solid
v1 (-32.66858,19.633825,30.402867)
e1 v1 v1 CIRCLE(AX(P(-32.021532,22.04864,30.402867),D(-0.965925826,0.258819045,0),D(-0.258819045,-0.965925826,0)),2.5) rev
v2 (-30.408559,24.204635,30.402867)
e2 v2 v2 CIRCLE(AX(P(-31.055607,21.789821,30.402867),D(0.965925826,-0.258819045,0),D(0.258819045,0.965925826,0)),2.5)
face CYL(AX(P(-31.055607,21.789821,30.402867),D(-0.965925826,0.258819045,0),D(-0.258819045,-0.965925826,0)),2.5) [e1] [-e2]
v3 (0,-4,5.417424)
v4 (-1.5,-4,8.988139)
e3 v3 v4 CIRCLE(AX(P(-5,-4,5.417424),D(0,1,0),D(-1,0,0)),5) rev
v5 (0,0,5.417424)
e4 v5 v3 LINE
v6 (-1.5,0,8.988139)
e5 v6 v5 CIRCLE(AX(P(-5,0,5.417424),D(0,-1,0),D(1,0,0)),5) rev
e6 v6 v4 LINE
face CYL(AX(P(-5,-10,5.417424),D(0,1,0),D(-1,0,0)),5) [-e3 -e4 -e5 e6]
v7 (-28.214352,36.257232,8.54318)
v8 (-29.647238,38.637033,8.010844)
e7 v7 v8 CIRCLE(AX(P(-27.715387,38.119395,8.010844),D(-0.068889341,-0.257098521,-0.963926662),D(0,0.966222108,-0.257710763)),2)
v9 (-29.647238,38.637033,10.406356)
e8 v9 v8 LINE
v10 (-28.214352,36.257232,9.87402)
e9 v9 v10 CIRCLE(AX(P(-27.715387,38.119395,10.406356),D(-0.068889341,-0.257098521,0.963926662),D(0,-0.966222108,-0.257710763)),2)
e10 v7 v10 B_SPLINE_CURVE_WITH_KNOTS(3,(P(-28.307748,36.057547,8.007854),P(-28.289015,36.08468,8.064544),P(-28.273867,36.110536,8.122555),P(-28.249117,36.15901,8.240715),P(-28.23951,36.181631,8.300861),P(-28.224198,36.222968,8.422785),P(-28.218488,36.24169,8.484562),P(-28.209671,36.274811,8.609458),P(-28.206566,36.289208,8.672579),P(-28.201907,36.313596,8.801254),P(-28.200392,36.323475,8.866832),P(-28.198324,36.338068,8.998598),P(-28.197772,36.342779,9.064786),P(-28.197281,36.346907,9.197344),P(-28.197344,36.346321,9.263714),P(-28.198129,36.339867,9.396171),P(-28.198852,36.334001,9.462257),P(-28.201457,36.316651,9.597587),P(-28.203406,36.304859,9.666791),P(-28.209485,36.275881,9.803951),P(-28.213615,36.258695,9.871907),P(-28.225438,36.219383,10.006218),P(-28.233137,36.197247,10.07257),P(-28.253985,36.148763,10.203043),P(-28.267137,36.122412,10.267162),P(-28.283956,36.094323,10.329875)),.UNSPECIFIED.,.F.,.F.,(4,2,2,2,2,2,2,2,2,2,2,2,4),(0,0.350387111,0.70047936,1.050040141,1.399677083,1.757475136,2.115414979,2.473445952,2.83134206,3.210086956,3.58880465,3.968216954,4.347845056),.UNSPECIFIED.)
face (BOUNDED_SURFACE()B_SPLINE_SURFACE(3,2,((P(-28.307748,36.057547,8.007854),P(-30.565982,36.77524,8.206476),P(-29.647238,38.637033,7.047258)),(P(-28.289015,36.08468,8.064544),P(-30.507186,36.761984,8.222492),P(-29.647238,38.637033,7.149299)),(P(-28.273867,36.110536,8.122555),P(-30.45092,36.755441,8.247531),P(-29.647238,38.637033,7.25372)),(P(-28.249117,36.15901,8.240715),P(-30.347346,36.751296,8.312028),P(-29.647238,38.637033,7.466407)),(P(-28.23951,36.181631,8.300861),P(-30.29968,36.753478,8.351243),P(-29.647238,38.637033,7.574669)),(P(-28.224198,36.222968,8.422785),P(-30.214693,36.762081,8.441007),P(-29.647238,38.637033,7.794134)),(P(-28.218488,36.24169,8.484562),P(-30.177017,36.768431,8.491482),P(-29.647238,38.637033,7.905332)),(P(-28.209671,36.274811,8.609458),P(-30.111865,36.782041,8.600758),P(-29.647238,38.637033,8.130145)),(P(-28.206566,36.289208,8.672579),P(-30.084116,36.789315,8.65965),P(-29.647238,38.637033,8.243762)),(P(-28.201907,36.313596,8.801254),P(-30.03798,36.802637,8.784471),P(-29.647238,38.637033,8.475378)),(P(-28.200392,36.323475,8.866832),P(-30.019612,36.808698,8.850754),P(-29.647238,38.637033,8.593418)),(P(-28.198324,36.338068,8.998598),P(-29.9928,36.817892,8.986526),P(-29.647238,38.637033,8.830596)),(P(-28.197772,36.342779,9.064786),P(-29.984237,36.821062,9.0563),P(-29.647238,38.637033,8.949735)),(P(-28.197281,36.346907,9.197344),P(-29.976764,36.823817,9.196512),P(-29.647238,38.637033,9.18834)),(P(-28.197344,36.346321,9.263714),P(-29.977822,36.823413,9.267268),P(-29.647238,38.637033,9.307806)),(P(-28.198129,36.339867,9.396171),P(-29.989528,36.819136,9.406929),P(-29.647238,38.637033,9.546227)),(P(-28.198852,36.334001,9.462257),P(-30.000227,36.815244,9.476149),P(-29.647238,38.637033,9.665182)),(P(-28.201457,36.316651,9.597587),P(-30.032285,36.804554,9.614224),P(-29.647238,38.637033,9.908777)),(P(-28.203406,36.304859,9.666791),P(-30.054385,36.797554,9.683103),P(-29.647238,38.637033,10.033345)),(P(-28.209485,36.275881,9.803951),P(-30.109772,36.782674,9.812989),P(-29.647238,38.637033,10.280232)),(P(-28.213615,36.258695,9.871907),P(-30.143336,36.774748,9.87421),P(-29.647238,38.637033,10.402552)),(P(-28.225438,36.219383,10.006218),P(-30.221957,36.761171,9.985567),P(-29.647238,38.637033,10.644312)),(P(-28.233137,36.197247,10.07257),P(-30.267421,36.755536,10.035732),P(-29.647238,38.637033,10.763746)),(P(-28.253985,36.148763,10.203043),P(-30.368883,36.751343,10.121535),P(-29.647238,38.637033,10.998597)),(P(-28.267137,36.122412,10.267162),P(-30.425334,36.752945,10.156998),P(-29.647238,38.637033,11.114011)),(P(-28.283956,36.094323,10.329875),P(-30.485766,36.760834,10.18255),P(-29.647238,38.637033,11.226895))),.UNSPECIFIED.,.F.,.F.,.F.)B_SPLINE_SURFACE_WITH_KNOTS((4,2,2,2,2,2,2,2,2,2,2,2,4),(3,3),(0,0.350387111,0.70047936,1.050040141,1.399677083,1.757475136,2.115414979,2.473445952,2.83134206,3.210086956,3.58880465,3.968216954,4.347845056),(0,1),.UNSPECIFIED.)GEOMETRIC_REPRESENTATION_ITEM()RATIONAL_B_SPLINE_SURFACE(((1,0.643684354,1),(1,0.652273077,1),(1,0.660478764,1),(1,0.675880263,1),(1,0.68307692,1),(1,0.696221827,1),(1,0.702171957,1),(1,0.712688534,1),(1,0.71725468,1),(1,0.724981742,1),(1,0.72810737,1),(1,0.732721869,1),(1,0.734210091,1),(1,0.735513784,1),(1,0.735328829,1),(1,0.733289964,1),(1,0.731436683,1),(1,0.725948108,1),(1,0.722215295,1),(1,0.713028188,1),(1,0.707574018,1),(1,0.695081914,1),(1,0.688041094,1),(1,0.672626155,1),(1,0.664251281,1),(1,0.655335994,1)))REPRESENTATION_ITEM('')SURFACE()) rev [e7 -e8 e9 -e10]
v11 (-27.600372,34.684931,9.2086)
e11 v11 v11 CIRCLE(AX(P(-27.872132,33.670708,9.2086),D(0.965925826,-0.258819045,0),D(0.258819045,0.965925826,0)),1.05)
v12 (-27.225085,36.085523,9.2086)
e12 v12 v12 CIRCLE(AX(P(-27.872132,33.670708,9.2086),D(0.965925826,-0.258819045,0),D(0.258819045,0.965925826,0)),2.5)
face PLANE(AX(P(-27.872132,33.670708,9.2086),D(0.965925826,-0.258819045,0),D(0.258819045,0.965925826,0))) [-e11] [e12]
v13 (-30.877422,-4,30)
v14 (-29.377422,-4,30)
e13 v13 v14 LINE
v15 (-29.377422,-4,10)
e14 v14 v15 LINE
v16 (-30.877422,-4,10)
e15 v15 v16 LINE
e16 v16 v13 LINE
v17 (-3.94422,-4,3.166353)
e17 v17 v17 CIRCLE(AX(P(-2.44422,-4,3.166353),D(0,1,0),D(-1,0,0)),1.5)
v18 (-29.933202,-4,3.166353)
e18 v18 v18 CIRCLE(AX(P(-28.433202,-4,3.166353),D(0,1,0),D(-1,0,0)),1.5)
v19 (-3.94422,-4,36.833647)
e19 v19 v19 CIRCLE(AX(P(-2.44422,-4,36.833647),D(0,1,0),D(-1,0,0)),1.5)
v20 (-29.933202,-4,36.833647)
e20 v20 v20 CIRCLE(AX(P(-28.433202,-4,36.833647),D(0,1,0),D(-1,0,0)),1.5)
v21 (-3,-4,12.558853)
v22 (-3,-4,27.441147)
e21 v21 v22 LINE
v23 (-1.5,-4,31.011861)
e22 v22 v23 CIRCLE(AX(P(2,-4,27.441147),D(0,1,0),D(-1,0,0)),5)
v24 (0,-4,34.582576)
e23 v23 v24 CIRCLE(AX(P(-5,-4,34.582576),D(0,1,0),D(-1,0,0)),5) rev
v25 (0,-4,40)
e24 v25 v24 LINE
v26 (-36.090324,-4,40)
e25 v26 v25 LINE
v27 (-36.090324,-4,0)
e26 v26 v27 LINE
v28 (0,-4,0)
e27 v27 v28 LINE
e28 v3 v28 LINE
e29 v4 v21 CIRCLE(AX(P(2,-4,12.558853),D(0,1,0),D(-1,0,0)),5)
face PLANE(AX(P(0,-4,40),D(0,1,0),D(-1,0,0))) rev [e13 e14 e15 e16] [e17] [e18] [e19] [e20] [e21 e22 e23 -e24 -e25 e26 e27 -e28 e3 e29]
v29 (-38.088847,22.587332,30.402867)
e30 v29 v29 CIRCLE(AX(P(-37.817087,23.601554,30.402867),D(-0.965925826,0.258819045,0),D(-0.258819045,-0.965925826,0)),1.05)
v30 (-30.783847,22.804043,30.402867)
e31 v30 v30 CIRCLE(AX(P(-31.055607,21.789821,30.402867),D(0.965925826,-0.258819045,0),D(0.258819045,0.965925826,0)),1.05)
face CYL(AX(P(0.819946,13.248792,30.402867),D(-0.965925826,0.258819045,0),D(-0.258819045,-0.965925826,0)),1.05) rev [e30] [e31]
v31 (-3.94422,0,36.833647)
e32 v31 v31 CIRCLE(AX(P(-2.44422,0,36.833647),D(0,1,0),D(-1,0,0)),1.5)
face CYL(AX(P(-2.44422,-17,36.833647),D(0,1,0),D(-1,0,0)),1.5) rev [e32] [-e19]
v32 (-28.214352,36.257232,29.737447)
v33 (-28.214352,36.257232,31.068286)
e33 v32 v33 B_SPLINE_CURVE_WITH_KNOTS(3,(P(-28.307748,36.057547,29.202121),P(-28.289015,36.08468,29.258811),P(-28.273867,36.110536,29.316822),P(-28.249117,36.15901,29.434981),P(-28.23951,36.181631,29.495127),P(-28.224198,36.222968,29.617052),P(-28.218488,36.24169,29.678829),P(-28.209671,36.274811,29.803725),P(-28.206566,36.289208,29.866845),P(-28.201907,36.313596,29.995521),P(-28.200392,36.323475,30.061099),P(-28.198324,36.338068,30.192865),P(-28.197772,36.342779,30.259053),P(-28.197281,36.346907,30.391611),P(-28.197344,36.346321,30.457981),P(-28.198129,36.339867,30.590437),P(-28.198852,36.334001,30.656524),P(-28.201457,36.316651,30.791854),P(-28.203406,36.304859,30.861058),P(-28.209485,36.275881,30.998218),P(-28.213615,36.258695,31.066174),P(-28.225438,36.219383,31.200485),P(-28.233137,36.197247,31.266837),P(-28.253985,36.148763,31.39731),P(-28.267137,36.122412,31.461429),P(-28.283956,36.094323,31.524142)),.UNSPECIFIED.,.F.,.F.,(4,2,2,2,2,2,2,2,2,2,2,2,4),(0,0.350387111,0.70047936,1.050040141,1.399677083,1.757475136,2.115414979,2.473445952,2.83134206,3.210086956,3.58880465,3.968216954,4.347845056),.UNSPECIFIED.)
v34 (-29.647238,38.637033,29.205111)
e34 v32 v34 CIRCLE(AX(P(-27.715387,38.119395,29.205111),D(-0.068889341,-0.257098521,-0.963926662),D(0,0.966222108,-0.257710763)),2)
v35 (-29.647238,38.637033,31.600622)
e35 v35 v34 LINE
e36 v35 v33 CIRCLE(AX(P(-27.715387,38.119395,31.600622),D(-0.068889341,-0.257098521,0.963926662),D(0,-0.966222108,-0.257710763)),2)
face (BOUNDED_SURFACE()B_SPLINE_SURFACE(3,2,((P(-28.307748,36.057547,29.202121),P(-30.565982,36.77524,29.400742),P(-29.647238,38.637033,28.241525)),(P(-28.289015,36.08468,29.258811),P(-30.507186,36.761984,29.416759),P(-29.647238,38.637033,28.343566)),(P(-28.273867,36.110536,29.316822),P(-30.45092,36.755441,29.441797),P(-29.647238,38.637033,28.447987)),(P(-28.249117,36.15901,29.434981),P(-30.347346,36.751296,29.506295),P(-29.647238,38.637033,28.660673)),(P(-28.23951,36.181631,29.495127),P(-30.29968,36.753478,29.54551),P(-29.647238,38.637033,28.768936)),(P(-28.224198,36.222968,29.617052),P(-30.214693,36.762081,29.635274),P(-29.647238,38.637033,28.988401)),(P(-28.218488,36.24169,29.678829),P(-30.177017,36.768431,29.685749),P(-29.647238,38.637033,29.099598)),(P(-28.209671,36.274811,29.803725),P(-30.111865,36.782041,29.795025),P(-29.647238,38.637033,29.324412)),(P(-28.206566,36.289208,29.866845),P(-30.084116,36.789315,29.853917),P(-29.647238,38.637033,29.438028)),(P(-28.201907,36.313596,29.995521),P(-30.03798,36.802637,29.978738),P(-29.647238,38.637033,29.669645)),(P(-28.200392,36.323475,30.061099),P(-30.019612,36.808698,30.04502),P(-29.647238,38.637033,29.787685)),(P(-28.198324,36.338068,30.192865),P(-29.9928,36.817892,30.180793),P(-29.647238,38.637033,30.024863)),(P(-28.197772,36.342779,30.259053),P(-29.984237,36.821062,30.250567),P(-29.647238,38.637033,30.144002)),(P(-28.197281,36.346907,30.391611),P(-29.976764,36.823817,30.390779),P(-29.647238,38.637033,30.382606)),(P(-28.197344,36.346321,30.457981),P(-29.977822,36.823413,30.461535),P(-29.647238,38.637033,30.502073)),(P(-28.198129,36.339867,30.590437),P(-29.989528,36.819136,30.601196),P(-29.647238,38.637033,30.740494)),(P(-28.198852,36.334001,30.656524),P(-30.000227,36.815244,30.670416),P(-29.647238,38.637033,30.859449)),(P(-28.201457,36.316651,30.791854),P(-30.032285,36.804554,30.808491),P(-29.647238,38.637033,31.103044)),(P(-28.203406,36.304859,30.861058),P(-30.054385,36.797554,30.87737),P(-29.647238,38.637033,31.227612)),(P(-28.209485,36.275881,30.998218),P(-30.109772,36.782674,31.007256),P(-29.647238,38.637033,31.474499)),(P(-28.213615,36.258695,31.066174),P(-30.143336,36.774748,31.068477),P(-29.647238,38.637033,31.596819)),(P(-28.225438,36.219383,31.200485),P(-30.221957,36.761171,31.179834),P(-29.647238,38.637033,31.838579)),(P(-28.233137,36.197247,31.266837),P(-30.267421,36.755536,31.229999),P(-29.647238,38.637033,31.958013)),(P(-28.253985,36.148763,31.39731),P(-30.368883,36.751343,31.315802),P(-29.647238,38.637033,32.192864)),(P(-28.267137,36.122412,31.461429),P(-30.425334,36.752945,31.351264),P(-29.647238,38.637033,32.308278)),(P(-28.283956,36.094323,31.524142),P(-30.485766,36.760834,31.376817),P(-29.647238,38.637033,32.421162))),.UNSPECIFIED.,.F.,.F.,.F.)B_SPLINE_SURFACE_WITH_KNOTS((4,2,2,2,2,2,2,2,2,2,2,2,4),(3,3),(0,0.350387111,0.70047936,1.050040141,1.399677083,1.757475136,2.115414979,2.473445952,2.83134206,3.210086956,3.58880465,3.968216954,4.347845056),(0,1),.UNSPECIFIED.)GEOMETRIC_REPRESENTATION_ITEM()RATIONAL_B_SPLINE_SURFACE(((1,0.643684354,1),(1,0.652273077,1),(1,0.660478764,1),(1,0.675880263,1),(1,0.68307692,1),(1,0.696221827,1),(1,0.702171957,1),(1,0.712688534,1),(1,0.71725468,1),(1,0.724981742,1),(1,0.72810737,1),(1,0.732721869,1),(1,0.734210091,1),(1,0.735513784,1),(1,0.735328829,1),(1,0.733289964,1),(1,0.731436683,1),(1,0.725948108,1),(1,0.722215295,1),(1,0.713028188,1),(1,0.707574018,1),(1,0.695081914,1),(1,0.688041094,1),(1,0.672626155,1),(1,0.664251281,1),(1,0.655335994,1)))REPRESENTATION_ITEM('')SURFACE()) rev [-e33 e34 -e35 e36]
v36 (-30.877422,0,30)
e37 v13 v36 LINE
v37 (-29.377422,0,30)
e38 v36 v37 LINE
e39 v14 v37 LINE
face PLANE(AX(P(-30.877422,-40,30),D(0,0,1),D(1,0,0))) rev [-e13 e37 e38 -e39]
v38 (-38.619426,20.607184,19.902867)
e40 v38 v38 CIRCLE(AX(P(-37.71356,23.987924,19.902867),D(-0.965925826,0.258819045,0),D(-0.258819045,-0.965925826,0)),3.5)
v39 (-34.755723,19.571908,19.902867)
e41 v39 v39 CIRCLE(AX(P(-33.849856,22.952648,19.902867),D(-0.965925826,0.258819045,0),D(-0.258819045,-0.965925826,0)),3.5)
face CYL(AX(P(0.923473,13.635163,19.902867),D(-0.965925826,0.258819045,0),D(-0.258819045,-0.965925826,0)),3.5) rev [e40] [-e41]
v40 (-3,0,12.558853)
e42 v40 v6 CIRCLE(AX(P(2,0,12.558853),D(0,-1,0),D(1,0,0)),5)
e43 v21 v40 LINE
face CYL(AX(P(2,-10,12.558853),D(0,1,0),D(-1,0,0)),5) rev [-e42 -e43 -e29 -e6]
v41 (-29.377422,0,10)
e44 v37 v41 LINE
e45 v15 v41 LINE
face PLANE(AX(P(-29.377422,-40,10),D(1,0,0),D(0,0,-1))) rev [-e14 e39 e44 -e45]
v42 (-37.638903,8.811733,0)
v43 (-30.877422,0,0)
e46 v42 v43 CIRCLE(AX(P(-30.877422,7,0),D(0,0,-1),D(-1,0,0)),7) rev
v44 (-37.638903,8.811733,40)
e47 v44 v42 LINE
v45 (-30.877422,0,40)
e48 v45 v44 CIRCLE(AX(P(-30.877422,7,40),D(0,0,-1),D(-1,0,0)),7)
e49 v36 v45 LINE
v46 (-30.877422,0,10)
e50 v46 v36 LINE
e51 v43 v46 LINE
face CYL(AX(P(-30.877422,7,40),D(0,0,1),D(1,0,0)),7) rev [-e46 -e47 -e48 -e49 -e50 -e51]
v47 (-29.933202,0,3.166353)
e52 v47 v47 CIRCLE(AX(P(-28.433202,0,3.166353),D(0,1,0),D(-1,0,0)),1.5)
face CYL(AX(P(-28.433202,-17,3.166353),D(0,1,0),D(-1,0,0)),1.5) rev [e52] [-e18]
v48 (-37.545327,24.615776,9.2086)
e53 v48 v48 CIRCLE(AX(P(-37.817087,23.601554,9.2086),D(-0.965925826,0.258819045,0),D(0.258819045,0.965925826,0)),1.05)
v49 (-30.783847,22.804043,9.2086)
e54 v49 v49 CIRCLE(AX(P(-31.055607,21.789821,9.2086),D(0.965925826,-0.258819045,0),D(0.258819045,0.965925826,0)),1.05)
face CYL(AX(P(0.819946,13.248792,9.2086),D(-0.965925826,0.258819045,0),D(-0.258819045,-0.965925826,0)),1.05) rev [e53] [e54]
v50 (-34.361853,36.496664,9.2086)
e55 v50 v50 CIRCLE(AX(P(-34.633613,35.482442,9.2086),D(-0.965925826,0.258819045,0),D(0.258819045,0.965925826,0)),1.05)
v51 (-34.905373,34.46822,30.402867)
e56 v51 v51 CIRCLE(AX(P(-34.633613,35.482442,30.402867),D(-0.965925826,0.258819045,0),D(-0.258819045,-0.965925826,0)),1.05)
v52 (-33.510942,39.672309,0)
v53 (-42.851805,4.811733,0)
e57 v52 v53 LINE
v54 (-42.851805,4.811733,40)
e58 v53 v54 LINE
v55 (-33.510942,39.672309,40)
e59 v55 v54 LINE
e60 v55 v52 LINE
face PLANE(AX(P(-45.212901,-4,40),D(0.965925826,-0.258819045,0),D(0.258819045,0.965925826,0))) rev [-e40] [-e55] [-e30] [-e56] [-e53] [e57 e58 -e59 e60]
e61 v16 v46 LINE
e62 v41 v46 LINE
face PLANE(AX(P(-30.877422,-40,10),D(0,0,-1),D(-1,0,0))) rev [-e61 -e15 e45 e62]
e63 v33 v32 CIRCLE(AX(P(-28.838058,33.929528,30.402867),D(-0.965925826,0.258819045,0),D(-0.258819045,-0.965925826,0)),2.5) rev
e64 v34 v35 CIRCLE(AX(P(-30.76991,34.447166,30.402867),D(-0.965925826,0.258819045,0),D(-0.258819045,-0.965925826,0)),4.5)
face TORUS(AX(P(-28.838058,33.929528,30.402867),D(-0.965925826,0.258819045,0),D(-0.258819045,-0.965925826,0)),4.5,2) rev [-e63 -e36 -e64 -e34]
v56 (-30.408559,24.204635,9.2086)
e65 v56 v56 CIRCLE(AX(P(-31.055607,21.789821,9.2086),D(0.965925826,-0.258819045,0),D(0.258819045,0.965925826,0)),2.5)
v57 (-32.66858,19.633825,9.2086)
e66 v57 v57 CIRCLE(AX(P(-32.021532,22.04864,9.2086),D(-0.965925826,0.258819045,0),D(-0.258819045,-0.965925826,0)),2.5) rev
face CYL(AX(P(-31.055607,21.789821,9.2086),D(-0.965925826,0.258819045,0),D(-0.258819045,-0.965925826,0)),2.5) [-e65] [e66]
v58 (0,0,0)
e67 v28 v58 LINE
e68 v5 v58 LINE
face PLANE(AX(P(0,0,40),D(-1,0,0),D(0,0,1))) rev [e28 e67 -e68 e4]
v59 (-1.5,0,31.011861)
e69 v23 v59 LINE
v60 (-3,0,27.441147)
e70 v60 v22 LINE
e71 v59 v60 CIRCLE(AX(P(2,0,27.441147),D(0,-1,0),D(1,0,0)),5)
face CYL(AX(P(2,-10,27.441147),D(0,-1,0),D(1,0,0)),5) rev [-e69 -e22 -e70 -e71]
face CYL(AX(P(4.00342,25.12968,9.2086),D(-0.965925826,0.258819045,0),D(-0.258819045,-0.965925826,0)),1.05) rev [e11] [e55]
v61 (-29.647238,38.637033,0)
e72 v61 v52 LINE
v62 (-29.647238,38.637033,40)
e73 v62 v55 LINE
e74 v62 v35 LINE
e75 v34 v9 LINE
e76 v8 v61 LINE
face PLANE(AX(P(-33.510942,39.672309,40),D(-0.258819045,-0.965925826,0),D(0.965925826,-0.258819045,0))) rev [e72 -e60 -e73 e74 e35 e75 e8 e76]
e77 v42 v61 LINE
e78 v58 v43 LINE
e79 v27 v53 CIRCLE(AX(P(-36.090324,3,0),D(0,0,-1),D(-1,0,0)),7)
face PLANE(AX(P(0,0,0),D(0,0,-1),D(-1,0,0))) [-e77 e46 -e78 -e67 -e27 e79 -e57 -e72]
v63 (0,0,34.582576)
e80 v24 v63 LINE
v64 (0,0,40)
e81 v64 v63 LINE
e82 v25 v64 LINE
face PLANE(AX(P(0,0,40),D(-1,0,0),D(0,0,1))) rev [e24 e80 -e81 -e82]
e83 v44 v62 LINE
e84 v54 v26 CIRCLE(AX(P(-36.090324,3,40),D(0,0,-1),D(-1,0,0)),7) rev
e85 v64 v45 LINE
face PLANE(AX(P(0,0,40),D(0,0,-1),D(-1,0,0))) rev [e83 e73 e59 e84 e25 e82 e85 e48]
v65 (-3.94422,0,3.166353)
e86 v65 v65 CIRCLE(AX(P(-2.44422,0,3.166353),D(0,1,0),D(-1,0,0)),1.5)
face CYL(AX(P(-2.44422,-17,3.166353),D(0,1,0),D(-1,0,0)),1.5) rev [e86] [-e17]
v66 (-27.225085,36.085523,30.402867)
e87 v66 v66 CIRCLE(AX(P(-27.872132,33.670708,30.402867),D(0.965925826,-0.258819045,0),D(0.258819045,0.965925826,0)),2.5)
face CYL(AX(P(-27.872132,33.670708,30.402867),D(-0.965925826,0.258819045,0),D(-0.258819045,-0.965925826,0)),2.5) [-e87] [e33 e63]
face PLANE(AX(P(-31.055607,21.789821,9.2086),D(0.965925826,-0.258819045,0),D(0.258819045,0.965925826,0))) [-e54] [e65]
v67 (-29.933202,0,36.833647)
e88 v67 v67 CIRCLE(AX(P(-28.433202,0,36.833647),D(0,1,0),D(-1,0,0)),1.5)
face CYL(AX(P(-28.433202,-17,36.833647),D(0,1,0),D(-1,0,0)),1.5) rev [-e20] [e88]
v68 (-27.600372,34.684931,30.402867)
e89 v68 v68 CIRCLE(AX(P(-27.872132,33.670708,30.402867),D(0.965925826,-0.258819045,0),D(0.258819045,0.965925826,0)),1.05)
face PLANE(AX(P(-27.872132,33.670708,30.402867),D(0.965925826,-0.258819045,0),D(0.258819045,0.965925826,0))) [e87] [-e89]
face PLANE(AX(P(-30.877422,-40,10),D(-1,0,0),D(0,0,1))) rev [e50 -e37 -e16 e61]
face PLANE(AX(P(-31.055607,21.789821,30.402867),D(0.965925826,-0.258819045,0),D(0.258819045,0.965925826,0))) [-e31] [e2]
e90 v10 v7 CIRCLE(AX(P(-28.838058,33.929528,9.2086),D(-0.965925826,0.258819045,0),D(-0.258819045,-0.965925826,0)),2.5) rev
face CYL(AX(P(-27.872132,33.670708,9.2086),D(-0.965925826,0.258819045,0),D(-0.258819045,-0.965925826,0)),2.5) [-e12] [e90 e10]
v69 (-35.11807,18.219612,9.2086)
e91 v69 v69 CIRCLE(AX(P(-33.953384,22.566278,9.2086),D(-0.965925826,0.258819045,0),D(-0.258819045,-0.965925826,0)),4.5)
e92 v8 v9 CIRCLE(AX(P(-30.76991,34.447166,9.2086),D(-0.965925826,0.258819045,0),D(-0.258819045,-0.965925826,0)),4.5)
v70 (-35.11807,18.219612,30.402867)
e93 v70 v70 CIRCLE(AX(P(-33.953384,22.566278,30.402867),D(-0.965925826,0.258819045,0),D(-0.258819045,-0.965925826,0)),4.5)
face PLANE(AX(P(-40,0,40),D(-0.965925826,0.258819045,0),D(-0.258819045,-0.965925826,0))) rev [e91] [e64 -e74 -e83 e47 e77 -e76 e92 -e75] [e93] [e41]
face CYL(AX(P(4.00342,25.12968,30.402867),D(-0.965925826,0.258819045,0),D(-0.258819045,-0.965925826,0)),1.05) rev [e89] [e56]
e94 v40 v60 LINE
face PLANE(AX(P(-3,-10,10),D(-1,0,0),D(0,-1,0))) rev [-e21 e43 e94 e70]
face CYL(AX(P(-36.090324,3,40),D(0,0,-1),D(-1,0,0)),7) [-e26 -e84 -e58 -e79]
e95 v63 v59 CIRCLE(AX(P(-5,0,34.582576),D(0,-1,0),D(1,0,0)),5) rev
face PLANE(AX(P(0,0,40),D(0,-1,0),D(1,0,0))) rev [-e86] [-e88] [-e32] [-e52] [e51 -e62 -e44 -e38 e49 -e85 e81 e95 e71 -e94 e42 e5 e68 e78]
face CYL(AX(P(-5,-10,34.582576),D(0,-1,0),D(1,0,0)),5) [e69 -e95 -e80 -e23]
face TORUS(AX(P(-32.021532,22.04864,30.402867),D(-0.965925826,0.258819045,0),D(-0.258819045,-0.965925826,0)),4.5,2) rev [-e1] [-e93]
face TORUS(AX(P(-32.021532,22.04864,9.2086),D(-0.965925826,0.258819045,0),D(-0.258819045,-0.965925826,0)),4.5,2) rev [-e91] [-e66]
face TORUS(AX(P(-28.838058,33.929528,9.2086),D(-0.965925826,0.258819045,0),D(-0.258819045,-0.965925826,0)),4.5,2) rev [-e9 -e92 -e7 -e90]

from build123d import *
from build123d.topology import SkipClean

# Parameters (mm, degrees)
ESTRUSIONE_ESTRUSIONE1_DEPTH = 40
RACCORDO1_R                  = 7
SCHIZZO2_W                   = 1.5
SCHIZZO2_H                   = 20
TAGLIO_ESTRUSIONE1_DEPTH     = 40
SCHIZZO3_R                   = 1.05
SCHIZZO3_R_2                 = 3.5
TAGLIO_ESTRUSIONE2_DEPTH     = 40
SCHIZZO4_R                   = 2.5
SCHIZZO4_R_2                 = 1.05
ESTRUSIONE_ESTRUSIONE2_DEPTH = 3
RACCORDO2_R                  = 2
SCHIZZO5_R                   = 1.5
TAGLIO_ESTRUSIONE3_DEPTH     = 17
TAGLIO_ESTRUSIONE4_DEPTH     = 10
RACCORDO3_R                  = 5
RACCORDO4_R                  = 5


with BuildPart() as part:
    # Schizzo1 → Estrusione-Estrusione1 (new body)
    with BuildSketch(Plane.XY):
        Polygon((0, 0), (-40, 0), (-29.647238196, 38.637033052), (-33.510941501, 39.672309232), (-45.212901491, -4), (0, -4), align=None)
    extrude(amount=ESTRUSIONE_ESTRUSIONE1_DEPTH)

    # Raccordo1
    raccordo1_edges = [part.edges().sort_by_distance(p)[0] for p in [
        (-45.212901491, -4, 20),
        (-40, 0, 20),
    ]]
    fillet(raccordo1_edges, radius=RACCORDO1_R)

    # Schizzo2 → Taglio-Estrusione1 (cut)
    with BuildSketch(Plane(origin=(0, 0, 0), x_dir=(1, 0, 0), z_dir=(0, 1, 0))):
        with Locations((-30.12742239, -20)):
            Rectangle(SCHIZZO2_W, SCHIZZO2_H)
    extrude(amount=-TAGLIO_ESTRUSIONE1_DEPTH, mode=Mode.SUBTRACT)

    # Schizzo3 → Taglio-Estrusione2 (cut)
    with BuildSketch(Plane(origin=(-41.184211381, 11.03527618, 0), x_dir=(0, 0, 1), z_dir=(-0.9659258262890673, 0.2588190451025247, 0))):
        with Locations(Location((30.402866557, 25.309568218, 0), (0, 0, 270))):
            Circle(SCHIZZO3_R)
        with Locations(Location((9.20859967, 25.309568218, 0), (0, 0, 270))):
            Circle(SCHIZZO3_R)
        with Locations(Location((30.402866557, 13.009568218, 0), (0, 0, 270))):
            Circle(SCHIZZO3_R)
        with Locations(Location((9.20859967, 13.009568218, 0), (0, 0, 270))):
            Circle(SCHIZZO3_R)
        with Locations(Location((19.902866557, 13.409568216, 0), (0, 0, 270))):
            Circle(SCHIZZO3_R_2)
    extrude(amount=-TAGLIO_ESTRUSIONE2_DEPTH, mode=Mode.SUBTRACT)

    # Schizzo4 → Estrusione-Estrusione2 (add)
    # profile 1 of 4: a face of its own
    with SkipClean():  # the faces are left unmerged after this step: merging them gives an invalid solid
        with BuildSketch(Plane(origin=(-37.320508076, 10, 0), x_dir=(0, 0, -1), z_dir=(0.9659258262890674, -0.2588190451025245, 0))):
            with Locations(Location((-9.20859967, 13.009568218, 0), (0, 0, 270))):
                Circle(SCHIZZO4_R)
            with Locations(Location((-9.20859967, 13.009568218, 0), (0, 0, 90))):
                Circle(SCHIZZO4_R_2, mode=Mode.SUBTRACT)
        # profile 2 of 4: a face of its own
        with BuildSketch(Plane(origin=(-37.320508076, 10, 0), x_dir=(0, 0, -1), z_dir=(0.9659258262890674, -0.2588190451025245, 0))):
            with Locations(Location((-30.402866557, 13.009568218, 0), (0, 0, 270))):
                Circle(SCHIZZO4_R)
            with Locations(Location((-30.402866557, 13.009568218, 0), (0, 0, 270))):
                Circle(SCHIZZO4_R_2, mode=Mode.SUBTRACT)
        # profile 3 of 4: a face of its own
        with BuildSketch(Plane(origin=(-37.320508076, 10, 0), x_dir=(0, 0, -1), z_dir=(0.9659258262890674, -0.2588190451025245, 0))):
            with Locations(Location((-30.402866557, 25.309568218, 0), (0, 0, 270))):
                Circle(SCHIZZO4_R)
            with Locations(Location((-30.402866557, 25.309568218, 0), (0, 0, 270))):
                Circle(SCHIZZO4_R_2, mode=Mode.SUBTRACT)
        # profile 4 of 4: a face of its own
        with BuildSketch(Plane(origin=(-37.320508076, 10, 0), x_dir=(0, 0, -1), z_dir=(0.9659258262890674, -0.2588190451025245, 0))):
            with Locations(Location((-9.20859967, 25.309568218, 0), (0, 0, 270))):
                Circle(SCHIZZO4_R)
            with Locations(Location((-9.20859967, 25.309568218, 0), (0, 0, 90))):
                Circle(SCHIZZO4_R_2, mode=Mode.SUBTRACT)
        extrude(amount=ESTRUSIONE_ESTRUSIONE2_DEPTH)
    add(part.part.scale(1), mode=Mode.REPLACE)  # the faces are merged on a copy

    # Raccordo2
    raccordo2_edges = [part.edges().sort_by_distance(p)[0] for p in [
        (-30.122862185, 36.86198016, 9.20859967),
        (-33.306336439, 24.981092497, 9.20859967),
        (-33.306336439, 24.981092497, 30.402866557),
        (-30.122862185, 36.86198016, 30.402866557),
    ]]
    fillet(raccordo2_edges, radius=RACCORDO2_R)

    # Schizzo5 → Taglio-Estrusione3 (cut)
    with BuildSketch(Plane(origin=(0, 0, 0), x_dir=(1, 0, 0), z_dir=(0, 1, 0))):
        with Locations(Location((-2.444220089, -36.8336475, 0), (0, 0, 180))):
            Circle(SCHIZZO5_R)
        with Locations(Location((-2.444220089, -3.1663525, 0), (0, 0, 180))):
            Circle(SCHIZZO5_R)
        with Locations(Location((-28.433202301, -3.1663525, 0), (0, 0, 180))):
            Circle(SCHIZZO5_R)
        with Locations(Location((-28.433202301, -36.8336475, 0), (0, 0, 180))):
            Circle(SCHIZZO5_R)
    extrude(amount=-TAGLIO_ESTRUSIONE3_DEPTH, mode=Mode.SUBTRACT)

    # Schizzo6 → Taglio-Estrusione4 (cut)
    with BuildSketch(Plane(origin=(0, 0, 0), x_dir=(1, 0, 0), z_dir=(0, 1, 0))):
        Polygon((0, -20), (0, -30), (-3, -30), (-3, -10), (0, -10), align=None)
    extrude(amount=-TAGLIO_ESTRUSIONE4_DEPTH, mode=Mode.SUBTRACT)

    # Raccordo3
    # the kernel refuses this fillet: 5 mm, written as the material it takes off along each edge
    with BuildSketch(Plane(origin=(0, 11.456439237, 10), x_dir=(0, 0, -1), z_dir=(0, -1, 0))) as raccordo3_piece_1:
        with BuildLine():
            CenterArc((4.582575695, -5), RACCORDO3_R, 90, 66.421821522)
            Line((0, -3), (-0.091651514, -2.96))
            ThreePointArc((-0.091651514, -2.96), (-0.1, -1.5), (-0.1, 0))
            Line((-0.1, 0), (0, 0.1))
            Line((0, 0.1), (4.582575695, 0.1))
            Line((4.582575695, 0.1), (4.582575695, 0))
        make_face()
    extrude(amount=26.912878475, mode=Mode.SUBTRACT)
    with BuildSketch(Plane(origin=(0, 11.456439237, 30), x_dir=(0, 0, 1), z_dir=(0, -1, 0))) as raccordo3_piece_2:
        with BuildLine():
            CenterArc((4.582575695, 5), RACCORDO3_R, 203.578178478, 66.421821522)
            Line((0, 3), (-0.091651514, 2.96))
            ThreePointArc((-0.091651514, 2.96), (-0.1, 1.5), (-0.1, 0))
            Line((-0.1, 0), (0, -0.1))
            Line((0, -0.1), (4.582575695, -0.1))
            Line((4.582575695, -0.1), (4.582575695, 0))
        make_face()
    extrude(amount=26.912878475, mode=Mode.SUBTRACT)

    # Raccordo4
    raccordo4_edges = [part.edges().sort_by_distance(p)[0] for p in [
        (-3, -2, 30),
        (-3, -2, 10),
    ]]
    fillet(raccordo4_edges, radius=RACCORDO4_R)


solid = part.part
